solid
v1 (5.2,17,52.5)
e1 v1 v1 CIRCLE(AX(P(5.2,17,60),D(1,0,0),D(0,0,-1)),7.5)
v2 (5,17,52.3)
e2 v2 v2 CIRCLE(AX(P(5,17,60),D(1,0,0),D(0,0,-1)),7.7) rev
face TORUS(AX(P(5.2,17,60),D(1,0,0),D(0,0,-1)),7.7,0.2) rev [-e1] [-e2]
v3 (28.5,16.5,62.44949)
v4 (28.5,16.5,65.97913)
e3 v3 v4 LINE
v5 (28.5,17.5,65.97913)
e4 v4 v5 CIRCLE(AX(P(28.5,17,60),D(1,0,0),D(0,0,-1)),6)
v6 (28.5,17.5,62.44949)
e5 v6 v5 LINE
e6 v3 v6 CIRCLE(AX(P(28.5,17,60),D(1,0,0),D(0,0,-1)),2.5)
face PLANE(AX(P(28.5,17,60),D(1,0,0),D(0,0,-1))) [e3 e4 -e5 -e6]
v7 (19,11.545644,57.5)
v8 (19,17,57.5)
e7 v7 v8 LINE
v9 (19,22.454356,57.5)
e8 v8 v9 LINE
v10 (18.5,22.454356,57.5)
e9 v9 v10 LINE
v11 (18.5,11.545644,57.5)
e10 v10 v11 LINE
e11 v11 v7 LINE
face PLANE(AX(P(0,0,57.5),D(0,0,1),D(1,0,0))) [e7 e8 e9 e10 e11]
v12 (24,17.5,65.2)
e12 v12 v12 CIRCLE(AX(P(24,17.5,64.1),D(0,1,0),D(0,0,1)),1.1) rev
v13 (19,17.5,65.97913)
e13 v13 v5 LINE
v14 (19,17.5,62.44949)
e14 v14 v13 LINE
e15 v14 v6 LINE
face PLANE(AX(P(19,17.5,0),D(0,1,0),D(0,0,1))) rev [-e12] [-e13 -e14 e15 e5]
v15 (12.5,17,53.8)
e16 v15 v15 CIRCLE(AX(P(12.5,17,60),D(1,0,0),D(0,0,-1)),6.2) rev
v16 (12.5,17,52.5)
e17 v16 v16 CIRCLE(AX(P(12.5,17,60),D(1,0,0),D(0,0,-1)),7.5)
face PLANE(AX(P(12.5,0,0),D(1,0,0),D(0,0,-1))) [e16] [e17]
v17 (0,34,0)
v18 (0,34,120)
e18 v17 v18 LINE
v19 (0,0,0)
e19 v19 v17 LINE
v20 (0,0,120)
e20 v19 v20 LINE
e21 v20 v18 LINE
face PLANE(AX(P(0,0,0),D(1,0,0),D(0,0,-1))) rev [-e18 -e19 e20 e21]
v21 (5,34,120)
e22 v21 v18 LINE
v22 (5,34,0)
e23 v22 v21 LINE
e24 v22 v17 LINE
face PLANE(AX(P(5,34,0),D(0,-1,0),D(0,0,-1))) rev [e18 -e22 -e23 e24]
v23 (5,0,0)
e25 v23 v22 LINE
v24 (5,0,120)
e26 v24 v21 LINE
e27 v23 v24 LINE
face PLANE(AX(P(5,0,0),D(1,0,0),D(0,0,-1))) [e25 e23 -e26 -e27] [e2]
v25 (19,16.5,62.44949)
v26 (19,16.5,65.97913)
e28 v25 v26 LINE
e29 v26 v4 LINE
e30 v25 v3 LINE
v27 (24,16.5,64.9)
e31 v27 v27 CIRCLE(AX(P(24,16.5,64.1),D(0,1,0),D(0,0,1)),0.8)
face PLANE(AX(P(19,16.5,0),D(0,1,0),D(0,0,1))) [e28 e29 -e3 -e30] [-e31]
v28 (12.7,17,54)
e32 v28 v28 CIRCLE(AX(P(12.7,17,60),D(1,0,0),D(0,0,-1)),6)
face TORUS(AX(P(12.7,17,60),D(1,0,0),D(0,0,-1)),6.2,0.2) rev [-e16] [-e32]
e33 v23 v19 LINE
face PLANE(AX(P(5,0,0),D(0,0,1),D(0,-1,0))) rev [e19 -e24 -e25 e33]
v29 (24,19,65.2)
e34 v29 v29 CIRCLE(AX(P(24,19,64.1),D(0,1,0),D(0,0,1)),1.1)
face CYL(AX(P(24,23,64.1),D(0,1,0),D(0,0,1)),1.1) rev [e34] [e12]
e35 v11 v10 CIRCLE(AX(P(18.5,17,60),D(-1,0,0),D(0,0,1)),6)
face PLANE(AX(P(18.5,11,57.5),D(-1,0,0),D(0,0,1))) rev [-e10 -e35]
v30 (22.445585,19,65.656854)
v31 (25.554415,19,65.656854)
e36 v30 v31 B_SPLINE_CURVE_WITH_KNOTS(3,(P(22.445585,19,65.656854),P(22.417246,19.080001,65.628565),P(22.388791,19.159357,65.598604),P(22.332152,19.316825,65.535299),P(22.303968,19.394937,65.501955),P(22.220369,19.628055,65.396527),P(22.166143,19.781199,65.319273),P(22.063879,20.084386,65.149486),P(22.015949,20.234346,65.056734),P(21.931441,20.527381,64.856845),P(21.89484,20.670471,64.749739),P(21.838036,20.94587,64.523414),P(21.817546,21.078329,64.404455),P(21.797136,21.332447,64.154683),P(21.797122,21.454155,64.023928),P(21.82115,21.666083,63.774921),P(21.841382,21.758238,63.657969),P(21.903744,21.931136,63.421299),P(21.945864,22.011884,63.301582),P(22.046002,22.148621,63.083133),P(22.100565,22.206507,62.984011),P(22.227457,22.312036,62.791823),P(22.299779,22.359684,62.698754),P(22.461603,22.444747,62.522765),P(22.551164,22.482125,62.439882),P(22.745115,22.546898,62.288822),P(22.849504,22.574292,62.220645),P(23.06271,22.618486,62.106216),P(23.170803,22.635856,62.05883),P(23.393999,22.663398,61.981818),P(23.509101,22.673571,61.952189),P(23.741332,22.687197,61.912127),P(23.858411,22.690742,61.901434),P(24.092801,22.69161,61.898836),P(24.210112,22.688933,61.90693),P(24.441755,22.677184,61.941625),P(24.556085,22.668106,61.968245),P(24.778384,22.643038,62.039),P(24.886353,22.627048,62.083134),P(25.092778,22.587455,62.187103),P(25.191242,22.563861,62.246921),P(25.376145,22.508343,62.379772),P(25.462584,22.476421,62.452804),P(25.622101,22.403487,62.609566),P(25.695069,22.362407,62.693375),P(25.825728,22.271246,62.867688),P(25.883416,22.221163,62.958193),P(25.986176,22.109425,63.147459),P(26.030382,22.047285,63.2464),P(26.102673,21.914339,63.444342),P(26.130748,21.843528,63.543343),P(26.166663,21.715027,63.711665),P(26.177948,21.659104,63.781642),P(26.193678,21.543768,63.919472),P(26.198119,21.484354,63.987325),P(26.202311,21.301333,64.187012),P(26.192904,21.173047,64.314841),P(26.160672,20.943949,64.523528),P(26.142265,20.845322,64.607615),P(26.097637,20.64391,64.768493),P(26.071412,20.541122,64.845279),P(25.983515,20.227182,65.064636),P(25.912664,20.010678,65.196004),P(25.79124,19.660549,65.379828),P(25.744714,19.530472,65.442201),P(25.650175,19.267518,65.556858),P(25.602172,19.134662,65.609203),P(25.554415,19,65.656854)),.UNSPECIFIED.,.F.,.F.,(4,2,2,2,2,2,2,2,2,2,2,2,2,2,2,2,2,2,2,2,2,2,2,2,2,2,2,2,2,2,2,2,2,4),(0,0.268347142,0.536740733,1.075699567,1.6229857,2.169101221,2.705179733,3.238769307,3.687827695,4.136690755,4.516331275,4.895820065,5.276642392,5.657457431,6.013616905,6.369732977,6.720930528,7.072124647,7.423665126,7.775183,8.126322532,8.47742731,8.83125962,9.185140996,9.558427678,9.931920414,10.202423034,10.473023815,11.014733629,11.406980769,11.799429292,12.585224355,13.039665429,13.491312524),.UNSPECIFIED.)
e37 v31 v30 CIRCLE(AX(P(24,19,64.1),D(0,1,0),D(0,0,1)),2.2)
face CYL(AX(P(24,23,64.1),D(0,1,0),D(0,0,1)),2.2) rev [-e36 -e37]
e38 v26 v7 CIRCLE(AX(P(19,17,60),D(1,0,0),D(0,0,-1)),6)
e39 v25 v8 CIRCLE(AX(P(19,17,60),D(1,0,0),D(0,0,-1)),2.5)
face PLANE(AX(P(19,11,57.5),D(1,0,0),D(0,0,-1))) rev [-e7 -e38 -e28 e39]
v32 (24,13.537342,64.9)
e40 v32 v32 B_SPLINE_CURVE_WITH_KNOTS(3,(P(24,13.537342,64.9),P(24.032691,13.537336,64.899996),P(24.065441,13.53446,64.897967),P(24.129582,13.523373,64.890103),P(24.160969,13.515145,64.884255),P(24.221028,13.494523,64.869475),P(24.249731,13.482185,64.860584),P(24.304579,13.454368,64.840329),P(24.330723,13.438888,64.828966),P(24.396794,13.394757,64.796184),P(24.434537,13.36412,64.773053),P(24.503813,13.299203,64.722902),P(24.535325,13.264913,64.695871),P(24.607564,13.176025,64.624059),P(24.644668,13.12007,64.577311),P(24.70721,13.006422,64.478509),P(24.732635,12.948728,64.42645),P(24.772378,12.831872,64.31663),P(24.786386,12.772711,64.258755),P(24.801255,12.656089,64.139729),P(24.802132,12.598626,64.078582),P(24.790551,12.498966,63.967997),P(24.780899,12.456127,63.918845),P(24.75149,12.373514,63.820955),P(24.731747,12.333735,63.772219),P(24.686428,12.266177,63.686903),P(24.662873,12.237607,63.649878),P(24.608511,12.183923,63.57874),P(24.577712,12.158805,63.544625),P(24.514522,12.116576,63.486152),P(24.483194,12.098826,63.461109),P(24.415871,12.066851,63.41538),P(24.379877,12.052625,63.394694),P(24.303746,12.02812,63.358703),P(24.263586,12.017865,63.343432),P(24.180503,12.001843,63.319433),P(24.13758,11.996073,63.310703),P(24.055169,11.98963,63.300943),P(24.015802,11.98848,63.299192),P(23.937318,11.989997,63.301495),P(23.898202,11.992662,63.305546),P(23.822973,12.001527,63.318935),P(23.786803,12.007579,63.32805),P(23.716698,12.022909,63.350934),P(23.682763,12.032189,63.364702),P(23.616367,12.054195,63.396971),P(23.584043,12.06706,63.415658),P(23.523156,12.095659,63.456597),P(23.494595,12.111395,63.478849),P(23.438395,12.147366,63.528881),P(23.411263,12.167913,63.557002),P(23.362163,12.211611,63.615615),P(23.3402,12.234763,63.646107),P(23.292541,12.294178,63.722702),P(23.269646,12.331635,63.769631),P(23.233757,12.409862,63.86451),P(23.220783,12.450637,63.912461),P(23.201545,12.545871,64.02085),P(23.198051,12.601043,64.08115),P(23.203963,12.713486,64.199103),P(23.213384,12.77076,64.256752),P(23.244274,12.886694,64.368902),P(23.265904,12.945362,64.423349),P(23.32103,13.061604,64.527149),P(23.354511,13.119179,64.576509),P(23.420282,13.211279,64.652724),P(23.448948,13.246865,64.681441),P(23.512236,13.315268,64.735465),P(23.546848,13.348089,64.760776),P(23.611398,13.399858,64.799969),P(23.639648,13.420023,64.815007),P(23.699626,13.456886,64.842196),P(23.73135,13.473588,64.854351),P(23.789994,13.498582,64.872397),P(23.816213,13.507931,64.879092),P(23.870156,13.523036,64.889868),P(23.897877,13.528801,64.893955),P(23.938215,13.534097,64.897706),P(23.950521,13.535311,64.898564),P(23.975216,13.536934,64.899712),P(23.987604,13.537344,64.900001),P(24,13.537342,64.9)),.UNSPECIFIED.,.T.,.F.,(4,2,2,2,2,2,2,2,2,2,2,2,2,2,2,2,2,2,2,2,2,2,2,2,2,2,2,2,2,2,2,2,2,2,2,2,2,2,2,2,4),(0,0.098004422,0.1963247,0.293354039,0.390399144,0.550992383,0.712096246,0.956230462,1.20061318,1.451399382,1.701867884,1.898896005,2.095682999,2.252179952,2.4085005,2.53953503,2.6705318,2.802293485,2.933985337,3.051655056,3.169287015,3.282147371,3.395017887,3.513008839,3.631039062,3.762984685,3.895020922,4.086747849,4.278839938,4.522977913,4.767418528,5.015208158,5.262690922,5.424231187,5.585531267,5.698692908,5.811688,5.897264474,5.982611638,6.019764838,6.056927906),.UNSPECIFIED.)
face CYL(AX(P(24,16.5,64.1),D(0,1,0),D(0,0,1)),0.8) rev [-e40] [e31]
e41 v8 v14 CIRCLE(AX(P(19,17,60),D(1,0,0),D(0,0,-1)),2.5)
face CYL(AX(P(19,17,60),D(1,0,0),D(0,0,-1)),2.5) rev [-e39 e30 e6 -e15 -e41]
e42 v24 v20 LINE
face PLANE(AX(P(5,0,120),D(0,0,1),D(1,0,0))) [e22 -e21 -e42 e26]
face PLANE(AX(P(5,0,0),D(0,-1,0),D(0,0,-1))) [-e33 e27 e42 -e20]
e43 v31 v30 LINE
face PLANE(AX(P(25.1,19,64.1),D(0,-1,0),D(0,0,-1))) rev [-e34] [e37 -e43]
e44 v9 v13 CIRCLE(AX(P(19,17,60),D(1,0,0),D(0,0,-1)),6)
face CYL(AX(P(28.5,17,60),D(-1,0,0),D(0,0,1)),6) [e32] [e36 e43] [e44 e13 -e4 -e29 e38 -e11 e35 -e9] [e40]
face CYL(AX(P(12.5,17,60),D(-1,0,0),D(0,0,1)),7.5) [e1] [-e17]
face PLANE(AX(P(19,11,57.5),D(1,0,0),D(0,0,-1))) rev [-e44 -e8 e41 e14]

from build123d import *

# Parameters (mm, degrees)
SKETCH1_W                                     = 120
SKETCH1_H                                     = 34
BOSS_EXTRUDE1_DEPTH                           = 5
BOSS_EXTRUDE2_DEPTH                           = 7.5
SKETCH3_R                                     = 6
BOSS_EXTRUDE3_DEPTH                           = 16
CUT_EXTRUDE1_DEPTH                            = 9.5
SKETCH5_W                                     = 0.5
SKETCH5_H                                     = 12
CUT_EXTRUDE2_DEPTH                            = 8.5
CBORE_START                                   = 19
CBORE_FOR_M2_HEX_SOCKET_HEAD_CAP_SCREW1_DEPTH = 3.691221609
CBORE_START_2                                 = 17.5
CBORE_FOR_M2_HEX_SOCKET_HEAD_CAP_SCR_3_O_R    = 1.1
CBORE_FOR_M2_HEX_SOCKET_HEAD_CAP_SCR_3_DEPTH  = 1.5
M2_TAPPED_HOLE1_D                             = 1.6
FILLET1_R                                     = 0.2


# Read off the part's stored shape, not the designer's step: CBORE for M2 Hex Socket Head Cap Screw1
with BuildPart() as part:
    # Sketch1 → Boss-Extrude1 (new body)
    with BuildSketch(Plane(origin=(0, 0, 0), x_dir=(0, 0, -1), z_dir=(1, 0, 0))):
        with Locations((-60, 17)):
            Rectangle(SKETCH1_W, SKETCH1_H)
    extrude(amount=BOSS_EXTRUDE1_DEPTH)

    # Sketch2 → Boss-Extrude2 (add)
    with BuildSketch(Plane(origin=(5, 0, 0), x_dir=(0, 0, -1), z_dir=(1, 0, 0))):
        with BuildLine():
            ThreePointArc((-52.5, 17), (-54.696699141, 22.303300859), (-60, 24.5))
            Line((-60, 24.5), (-60, 9.5))
            ThreePointArc((-60, 9.5), (-54.696699141, 11.696699141), (-52.5, 17))
        make_face()
        with BuildLine():
            Line((-60, 9.5), (-60, 24.5))
            ThreePointArc((-60, 24.5), (-67.5, 17), (-60, 9.5))
        make_face()
    extrude(amount=BOSS_EXTRUDE2_DEPTH)

    # Sketch3 → Boss-Extrude3 (add)
    with BuildSketch(Plane(origin=(12.5, 0, 0), x_dir=(0, 0, -1), z_dir=(1, 0, 0))):
        with Locations((-60, 17)):
            Circle(SKETCH3_R)
    extrude(amount=BOSS_EXTRUDE3_DEPTH)

    # Sketch4 → Cut-Extrude1 (cut)
    with BuildSketch(Plane(origin=(28.5, 0, 0), x_dir=(0, 0, -1), z_dir=(1, 0, 0))):
        with BuildLine():
            Line((-62.449489743, 17.5), (-67.449489743, 17.5))
            Line((-67.449489743, 17.5), (-67.449489743, 16.5))
            Line((-67.449489743, 16.5), (-62.449489743, 16.5))
            ThreePointArc((-62.449489743, 16.5), (-57.5, 17), (-62.449489743, 17.5))
        make_face()
    extrude(amount=-CUT_EXTRUDE1_DEPTH, mode=Mode.SUBTRACT)

    # Sketch5 → Cut-Extrude2 (cut)
    with BuildSketch(Plane.XY.offset(66)):
        with Locations((18.75, 17)):
            Rectangle(SKETCH5_W, SKETCH5_H)
    extrude(amount=-CUT_EXTRUDE2_DEPTH, mode=Mode.SUBTRACT)

    # CBORE for M2 Hex Socket Head Cap Scr 2 → CBORE for M2 Hex Socket Head Cap Screw1 (cut)
    with BuildSketch(Plane(origin=(0, 0, 0), x_dir=(1, 0, 0), z_dir=(0, 1, 0)).offset(CBORE_START)):
        with BuildLine():
            Line((24.209160843, -67), (25.554414631, -65.656854249))
            ThreePointArc((25.554414631, -65.656854249), (24, -61.9), (22.445585369, -65.656854249))
            Line((22.445585369, -65.656854249), (23.790839157, -67))
            Line((23.790839157, -67), (24.209160843, -67))
        make_face()
    extrude(amount=CBORE_FOR_M2_HEX_SOCKET_HEAD_CAP_SCREW1_DEPTH, mode=Mode.SUBTRACT)

    # CBORE for M2 Hex Socket Head Cap Scr 3 o → CBORE for M2 Hex Socket Head Cap Scr 3 (cut)
    with BuildSketch(Plane(origin=(0, 0, 0), x_dir=(1, 0, 0), z_dir=(0, 1, 0)).offset(CBORE_START_2)):
        with Locations((24, -64.1)):
            Circle(CBORE_FOR_M2_HEX_SOCKET_HEAD_CAP_SCR_3_O_R)
    extrude(amount=CBORE_FOR_M2_HEX_SOCKET_HEAD_CAP_SCR_3_DEPTH, mode=Mode.SUBTRACT)

    # M2 Tapped Hole1 (through all)
    with Locations(Plane(origin=(0, 16.5, 0), x_dir=(1, 0, 0), z_dir=(0, 1, 0))):
        with Locations((24, -64.1)):
            Hole(M2_TAPPED_HOLE1_D / 2)

    # Fillet1
    fillet1_edges = [part.edges().sort_by_distance(p)[0] for p in [
        (5, 24.5, 60),
        (12.5, 17, 66),
    ]]
    fillet(fillet1_edges, radius=FILLET1_R)


solid = part.part
